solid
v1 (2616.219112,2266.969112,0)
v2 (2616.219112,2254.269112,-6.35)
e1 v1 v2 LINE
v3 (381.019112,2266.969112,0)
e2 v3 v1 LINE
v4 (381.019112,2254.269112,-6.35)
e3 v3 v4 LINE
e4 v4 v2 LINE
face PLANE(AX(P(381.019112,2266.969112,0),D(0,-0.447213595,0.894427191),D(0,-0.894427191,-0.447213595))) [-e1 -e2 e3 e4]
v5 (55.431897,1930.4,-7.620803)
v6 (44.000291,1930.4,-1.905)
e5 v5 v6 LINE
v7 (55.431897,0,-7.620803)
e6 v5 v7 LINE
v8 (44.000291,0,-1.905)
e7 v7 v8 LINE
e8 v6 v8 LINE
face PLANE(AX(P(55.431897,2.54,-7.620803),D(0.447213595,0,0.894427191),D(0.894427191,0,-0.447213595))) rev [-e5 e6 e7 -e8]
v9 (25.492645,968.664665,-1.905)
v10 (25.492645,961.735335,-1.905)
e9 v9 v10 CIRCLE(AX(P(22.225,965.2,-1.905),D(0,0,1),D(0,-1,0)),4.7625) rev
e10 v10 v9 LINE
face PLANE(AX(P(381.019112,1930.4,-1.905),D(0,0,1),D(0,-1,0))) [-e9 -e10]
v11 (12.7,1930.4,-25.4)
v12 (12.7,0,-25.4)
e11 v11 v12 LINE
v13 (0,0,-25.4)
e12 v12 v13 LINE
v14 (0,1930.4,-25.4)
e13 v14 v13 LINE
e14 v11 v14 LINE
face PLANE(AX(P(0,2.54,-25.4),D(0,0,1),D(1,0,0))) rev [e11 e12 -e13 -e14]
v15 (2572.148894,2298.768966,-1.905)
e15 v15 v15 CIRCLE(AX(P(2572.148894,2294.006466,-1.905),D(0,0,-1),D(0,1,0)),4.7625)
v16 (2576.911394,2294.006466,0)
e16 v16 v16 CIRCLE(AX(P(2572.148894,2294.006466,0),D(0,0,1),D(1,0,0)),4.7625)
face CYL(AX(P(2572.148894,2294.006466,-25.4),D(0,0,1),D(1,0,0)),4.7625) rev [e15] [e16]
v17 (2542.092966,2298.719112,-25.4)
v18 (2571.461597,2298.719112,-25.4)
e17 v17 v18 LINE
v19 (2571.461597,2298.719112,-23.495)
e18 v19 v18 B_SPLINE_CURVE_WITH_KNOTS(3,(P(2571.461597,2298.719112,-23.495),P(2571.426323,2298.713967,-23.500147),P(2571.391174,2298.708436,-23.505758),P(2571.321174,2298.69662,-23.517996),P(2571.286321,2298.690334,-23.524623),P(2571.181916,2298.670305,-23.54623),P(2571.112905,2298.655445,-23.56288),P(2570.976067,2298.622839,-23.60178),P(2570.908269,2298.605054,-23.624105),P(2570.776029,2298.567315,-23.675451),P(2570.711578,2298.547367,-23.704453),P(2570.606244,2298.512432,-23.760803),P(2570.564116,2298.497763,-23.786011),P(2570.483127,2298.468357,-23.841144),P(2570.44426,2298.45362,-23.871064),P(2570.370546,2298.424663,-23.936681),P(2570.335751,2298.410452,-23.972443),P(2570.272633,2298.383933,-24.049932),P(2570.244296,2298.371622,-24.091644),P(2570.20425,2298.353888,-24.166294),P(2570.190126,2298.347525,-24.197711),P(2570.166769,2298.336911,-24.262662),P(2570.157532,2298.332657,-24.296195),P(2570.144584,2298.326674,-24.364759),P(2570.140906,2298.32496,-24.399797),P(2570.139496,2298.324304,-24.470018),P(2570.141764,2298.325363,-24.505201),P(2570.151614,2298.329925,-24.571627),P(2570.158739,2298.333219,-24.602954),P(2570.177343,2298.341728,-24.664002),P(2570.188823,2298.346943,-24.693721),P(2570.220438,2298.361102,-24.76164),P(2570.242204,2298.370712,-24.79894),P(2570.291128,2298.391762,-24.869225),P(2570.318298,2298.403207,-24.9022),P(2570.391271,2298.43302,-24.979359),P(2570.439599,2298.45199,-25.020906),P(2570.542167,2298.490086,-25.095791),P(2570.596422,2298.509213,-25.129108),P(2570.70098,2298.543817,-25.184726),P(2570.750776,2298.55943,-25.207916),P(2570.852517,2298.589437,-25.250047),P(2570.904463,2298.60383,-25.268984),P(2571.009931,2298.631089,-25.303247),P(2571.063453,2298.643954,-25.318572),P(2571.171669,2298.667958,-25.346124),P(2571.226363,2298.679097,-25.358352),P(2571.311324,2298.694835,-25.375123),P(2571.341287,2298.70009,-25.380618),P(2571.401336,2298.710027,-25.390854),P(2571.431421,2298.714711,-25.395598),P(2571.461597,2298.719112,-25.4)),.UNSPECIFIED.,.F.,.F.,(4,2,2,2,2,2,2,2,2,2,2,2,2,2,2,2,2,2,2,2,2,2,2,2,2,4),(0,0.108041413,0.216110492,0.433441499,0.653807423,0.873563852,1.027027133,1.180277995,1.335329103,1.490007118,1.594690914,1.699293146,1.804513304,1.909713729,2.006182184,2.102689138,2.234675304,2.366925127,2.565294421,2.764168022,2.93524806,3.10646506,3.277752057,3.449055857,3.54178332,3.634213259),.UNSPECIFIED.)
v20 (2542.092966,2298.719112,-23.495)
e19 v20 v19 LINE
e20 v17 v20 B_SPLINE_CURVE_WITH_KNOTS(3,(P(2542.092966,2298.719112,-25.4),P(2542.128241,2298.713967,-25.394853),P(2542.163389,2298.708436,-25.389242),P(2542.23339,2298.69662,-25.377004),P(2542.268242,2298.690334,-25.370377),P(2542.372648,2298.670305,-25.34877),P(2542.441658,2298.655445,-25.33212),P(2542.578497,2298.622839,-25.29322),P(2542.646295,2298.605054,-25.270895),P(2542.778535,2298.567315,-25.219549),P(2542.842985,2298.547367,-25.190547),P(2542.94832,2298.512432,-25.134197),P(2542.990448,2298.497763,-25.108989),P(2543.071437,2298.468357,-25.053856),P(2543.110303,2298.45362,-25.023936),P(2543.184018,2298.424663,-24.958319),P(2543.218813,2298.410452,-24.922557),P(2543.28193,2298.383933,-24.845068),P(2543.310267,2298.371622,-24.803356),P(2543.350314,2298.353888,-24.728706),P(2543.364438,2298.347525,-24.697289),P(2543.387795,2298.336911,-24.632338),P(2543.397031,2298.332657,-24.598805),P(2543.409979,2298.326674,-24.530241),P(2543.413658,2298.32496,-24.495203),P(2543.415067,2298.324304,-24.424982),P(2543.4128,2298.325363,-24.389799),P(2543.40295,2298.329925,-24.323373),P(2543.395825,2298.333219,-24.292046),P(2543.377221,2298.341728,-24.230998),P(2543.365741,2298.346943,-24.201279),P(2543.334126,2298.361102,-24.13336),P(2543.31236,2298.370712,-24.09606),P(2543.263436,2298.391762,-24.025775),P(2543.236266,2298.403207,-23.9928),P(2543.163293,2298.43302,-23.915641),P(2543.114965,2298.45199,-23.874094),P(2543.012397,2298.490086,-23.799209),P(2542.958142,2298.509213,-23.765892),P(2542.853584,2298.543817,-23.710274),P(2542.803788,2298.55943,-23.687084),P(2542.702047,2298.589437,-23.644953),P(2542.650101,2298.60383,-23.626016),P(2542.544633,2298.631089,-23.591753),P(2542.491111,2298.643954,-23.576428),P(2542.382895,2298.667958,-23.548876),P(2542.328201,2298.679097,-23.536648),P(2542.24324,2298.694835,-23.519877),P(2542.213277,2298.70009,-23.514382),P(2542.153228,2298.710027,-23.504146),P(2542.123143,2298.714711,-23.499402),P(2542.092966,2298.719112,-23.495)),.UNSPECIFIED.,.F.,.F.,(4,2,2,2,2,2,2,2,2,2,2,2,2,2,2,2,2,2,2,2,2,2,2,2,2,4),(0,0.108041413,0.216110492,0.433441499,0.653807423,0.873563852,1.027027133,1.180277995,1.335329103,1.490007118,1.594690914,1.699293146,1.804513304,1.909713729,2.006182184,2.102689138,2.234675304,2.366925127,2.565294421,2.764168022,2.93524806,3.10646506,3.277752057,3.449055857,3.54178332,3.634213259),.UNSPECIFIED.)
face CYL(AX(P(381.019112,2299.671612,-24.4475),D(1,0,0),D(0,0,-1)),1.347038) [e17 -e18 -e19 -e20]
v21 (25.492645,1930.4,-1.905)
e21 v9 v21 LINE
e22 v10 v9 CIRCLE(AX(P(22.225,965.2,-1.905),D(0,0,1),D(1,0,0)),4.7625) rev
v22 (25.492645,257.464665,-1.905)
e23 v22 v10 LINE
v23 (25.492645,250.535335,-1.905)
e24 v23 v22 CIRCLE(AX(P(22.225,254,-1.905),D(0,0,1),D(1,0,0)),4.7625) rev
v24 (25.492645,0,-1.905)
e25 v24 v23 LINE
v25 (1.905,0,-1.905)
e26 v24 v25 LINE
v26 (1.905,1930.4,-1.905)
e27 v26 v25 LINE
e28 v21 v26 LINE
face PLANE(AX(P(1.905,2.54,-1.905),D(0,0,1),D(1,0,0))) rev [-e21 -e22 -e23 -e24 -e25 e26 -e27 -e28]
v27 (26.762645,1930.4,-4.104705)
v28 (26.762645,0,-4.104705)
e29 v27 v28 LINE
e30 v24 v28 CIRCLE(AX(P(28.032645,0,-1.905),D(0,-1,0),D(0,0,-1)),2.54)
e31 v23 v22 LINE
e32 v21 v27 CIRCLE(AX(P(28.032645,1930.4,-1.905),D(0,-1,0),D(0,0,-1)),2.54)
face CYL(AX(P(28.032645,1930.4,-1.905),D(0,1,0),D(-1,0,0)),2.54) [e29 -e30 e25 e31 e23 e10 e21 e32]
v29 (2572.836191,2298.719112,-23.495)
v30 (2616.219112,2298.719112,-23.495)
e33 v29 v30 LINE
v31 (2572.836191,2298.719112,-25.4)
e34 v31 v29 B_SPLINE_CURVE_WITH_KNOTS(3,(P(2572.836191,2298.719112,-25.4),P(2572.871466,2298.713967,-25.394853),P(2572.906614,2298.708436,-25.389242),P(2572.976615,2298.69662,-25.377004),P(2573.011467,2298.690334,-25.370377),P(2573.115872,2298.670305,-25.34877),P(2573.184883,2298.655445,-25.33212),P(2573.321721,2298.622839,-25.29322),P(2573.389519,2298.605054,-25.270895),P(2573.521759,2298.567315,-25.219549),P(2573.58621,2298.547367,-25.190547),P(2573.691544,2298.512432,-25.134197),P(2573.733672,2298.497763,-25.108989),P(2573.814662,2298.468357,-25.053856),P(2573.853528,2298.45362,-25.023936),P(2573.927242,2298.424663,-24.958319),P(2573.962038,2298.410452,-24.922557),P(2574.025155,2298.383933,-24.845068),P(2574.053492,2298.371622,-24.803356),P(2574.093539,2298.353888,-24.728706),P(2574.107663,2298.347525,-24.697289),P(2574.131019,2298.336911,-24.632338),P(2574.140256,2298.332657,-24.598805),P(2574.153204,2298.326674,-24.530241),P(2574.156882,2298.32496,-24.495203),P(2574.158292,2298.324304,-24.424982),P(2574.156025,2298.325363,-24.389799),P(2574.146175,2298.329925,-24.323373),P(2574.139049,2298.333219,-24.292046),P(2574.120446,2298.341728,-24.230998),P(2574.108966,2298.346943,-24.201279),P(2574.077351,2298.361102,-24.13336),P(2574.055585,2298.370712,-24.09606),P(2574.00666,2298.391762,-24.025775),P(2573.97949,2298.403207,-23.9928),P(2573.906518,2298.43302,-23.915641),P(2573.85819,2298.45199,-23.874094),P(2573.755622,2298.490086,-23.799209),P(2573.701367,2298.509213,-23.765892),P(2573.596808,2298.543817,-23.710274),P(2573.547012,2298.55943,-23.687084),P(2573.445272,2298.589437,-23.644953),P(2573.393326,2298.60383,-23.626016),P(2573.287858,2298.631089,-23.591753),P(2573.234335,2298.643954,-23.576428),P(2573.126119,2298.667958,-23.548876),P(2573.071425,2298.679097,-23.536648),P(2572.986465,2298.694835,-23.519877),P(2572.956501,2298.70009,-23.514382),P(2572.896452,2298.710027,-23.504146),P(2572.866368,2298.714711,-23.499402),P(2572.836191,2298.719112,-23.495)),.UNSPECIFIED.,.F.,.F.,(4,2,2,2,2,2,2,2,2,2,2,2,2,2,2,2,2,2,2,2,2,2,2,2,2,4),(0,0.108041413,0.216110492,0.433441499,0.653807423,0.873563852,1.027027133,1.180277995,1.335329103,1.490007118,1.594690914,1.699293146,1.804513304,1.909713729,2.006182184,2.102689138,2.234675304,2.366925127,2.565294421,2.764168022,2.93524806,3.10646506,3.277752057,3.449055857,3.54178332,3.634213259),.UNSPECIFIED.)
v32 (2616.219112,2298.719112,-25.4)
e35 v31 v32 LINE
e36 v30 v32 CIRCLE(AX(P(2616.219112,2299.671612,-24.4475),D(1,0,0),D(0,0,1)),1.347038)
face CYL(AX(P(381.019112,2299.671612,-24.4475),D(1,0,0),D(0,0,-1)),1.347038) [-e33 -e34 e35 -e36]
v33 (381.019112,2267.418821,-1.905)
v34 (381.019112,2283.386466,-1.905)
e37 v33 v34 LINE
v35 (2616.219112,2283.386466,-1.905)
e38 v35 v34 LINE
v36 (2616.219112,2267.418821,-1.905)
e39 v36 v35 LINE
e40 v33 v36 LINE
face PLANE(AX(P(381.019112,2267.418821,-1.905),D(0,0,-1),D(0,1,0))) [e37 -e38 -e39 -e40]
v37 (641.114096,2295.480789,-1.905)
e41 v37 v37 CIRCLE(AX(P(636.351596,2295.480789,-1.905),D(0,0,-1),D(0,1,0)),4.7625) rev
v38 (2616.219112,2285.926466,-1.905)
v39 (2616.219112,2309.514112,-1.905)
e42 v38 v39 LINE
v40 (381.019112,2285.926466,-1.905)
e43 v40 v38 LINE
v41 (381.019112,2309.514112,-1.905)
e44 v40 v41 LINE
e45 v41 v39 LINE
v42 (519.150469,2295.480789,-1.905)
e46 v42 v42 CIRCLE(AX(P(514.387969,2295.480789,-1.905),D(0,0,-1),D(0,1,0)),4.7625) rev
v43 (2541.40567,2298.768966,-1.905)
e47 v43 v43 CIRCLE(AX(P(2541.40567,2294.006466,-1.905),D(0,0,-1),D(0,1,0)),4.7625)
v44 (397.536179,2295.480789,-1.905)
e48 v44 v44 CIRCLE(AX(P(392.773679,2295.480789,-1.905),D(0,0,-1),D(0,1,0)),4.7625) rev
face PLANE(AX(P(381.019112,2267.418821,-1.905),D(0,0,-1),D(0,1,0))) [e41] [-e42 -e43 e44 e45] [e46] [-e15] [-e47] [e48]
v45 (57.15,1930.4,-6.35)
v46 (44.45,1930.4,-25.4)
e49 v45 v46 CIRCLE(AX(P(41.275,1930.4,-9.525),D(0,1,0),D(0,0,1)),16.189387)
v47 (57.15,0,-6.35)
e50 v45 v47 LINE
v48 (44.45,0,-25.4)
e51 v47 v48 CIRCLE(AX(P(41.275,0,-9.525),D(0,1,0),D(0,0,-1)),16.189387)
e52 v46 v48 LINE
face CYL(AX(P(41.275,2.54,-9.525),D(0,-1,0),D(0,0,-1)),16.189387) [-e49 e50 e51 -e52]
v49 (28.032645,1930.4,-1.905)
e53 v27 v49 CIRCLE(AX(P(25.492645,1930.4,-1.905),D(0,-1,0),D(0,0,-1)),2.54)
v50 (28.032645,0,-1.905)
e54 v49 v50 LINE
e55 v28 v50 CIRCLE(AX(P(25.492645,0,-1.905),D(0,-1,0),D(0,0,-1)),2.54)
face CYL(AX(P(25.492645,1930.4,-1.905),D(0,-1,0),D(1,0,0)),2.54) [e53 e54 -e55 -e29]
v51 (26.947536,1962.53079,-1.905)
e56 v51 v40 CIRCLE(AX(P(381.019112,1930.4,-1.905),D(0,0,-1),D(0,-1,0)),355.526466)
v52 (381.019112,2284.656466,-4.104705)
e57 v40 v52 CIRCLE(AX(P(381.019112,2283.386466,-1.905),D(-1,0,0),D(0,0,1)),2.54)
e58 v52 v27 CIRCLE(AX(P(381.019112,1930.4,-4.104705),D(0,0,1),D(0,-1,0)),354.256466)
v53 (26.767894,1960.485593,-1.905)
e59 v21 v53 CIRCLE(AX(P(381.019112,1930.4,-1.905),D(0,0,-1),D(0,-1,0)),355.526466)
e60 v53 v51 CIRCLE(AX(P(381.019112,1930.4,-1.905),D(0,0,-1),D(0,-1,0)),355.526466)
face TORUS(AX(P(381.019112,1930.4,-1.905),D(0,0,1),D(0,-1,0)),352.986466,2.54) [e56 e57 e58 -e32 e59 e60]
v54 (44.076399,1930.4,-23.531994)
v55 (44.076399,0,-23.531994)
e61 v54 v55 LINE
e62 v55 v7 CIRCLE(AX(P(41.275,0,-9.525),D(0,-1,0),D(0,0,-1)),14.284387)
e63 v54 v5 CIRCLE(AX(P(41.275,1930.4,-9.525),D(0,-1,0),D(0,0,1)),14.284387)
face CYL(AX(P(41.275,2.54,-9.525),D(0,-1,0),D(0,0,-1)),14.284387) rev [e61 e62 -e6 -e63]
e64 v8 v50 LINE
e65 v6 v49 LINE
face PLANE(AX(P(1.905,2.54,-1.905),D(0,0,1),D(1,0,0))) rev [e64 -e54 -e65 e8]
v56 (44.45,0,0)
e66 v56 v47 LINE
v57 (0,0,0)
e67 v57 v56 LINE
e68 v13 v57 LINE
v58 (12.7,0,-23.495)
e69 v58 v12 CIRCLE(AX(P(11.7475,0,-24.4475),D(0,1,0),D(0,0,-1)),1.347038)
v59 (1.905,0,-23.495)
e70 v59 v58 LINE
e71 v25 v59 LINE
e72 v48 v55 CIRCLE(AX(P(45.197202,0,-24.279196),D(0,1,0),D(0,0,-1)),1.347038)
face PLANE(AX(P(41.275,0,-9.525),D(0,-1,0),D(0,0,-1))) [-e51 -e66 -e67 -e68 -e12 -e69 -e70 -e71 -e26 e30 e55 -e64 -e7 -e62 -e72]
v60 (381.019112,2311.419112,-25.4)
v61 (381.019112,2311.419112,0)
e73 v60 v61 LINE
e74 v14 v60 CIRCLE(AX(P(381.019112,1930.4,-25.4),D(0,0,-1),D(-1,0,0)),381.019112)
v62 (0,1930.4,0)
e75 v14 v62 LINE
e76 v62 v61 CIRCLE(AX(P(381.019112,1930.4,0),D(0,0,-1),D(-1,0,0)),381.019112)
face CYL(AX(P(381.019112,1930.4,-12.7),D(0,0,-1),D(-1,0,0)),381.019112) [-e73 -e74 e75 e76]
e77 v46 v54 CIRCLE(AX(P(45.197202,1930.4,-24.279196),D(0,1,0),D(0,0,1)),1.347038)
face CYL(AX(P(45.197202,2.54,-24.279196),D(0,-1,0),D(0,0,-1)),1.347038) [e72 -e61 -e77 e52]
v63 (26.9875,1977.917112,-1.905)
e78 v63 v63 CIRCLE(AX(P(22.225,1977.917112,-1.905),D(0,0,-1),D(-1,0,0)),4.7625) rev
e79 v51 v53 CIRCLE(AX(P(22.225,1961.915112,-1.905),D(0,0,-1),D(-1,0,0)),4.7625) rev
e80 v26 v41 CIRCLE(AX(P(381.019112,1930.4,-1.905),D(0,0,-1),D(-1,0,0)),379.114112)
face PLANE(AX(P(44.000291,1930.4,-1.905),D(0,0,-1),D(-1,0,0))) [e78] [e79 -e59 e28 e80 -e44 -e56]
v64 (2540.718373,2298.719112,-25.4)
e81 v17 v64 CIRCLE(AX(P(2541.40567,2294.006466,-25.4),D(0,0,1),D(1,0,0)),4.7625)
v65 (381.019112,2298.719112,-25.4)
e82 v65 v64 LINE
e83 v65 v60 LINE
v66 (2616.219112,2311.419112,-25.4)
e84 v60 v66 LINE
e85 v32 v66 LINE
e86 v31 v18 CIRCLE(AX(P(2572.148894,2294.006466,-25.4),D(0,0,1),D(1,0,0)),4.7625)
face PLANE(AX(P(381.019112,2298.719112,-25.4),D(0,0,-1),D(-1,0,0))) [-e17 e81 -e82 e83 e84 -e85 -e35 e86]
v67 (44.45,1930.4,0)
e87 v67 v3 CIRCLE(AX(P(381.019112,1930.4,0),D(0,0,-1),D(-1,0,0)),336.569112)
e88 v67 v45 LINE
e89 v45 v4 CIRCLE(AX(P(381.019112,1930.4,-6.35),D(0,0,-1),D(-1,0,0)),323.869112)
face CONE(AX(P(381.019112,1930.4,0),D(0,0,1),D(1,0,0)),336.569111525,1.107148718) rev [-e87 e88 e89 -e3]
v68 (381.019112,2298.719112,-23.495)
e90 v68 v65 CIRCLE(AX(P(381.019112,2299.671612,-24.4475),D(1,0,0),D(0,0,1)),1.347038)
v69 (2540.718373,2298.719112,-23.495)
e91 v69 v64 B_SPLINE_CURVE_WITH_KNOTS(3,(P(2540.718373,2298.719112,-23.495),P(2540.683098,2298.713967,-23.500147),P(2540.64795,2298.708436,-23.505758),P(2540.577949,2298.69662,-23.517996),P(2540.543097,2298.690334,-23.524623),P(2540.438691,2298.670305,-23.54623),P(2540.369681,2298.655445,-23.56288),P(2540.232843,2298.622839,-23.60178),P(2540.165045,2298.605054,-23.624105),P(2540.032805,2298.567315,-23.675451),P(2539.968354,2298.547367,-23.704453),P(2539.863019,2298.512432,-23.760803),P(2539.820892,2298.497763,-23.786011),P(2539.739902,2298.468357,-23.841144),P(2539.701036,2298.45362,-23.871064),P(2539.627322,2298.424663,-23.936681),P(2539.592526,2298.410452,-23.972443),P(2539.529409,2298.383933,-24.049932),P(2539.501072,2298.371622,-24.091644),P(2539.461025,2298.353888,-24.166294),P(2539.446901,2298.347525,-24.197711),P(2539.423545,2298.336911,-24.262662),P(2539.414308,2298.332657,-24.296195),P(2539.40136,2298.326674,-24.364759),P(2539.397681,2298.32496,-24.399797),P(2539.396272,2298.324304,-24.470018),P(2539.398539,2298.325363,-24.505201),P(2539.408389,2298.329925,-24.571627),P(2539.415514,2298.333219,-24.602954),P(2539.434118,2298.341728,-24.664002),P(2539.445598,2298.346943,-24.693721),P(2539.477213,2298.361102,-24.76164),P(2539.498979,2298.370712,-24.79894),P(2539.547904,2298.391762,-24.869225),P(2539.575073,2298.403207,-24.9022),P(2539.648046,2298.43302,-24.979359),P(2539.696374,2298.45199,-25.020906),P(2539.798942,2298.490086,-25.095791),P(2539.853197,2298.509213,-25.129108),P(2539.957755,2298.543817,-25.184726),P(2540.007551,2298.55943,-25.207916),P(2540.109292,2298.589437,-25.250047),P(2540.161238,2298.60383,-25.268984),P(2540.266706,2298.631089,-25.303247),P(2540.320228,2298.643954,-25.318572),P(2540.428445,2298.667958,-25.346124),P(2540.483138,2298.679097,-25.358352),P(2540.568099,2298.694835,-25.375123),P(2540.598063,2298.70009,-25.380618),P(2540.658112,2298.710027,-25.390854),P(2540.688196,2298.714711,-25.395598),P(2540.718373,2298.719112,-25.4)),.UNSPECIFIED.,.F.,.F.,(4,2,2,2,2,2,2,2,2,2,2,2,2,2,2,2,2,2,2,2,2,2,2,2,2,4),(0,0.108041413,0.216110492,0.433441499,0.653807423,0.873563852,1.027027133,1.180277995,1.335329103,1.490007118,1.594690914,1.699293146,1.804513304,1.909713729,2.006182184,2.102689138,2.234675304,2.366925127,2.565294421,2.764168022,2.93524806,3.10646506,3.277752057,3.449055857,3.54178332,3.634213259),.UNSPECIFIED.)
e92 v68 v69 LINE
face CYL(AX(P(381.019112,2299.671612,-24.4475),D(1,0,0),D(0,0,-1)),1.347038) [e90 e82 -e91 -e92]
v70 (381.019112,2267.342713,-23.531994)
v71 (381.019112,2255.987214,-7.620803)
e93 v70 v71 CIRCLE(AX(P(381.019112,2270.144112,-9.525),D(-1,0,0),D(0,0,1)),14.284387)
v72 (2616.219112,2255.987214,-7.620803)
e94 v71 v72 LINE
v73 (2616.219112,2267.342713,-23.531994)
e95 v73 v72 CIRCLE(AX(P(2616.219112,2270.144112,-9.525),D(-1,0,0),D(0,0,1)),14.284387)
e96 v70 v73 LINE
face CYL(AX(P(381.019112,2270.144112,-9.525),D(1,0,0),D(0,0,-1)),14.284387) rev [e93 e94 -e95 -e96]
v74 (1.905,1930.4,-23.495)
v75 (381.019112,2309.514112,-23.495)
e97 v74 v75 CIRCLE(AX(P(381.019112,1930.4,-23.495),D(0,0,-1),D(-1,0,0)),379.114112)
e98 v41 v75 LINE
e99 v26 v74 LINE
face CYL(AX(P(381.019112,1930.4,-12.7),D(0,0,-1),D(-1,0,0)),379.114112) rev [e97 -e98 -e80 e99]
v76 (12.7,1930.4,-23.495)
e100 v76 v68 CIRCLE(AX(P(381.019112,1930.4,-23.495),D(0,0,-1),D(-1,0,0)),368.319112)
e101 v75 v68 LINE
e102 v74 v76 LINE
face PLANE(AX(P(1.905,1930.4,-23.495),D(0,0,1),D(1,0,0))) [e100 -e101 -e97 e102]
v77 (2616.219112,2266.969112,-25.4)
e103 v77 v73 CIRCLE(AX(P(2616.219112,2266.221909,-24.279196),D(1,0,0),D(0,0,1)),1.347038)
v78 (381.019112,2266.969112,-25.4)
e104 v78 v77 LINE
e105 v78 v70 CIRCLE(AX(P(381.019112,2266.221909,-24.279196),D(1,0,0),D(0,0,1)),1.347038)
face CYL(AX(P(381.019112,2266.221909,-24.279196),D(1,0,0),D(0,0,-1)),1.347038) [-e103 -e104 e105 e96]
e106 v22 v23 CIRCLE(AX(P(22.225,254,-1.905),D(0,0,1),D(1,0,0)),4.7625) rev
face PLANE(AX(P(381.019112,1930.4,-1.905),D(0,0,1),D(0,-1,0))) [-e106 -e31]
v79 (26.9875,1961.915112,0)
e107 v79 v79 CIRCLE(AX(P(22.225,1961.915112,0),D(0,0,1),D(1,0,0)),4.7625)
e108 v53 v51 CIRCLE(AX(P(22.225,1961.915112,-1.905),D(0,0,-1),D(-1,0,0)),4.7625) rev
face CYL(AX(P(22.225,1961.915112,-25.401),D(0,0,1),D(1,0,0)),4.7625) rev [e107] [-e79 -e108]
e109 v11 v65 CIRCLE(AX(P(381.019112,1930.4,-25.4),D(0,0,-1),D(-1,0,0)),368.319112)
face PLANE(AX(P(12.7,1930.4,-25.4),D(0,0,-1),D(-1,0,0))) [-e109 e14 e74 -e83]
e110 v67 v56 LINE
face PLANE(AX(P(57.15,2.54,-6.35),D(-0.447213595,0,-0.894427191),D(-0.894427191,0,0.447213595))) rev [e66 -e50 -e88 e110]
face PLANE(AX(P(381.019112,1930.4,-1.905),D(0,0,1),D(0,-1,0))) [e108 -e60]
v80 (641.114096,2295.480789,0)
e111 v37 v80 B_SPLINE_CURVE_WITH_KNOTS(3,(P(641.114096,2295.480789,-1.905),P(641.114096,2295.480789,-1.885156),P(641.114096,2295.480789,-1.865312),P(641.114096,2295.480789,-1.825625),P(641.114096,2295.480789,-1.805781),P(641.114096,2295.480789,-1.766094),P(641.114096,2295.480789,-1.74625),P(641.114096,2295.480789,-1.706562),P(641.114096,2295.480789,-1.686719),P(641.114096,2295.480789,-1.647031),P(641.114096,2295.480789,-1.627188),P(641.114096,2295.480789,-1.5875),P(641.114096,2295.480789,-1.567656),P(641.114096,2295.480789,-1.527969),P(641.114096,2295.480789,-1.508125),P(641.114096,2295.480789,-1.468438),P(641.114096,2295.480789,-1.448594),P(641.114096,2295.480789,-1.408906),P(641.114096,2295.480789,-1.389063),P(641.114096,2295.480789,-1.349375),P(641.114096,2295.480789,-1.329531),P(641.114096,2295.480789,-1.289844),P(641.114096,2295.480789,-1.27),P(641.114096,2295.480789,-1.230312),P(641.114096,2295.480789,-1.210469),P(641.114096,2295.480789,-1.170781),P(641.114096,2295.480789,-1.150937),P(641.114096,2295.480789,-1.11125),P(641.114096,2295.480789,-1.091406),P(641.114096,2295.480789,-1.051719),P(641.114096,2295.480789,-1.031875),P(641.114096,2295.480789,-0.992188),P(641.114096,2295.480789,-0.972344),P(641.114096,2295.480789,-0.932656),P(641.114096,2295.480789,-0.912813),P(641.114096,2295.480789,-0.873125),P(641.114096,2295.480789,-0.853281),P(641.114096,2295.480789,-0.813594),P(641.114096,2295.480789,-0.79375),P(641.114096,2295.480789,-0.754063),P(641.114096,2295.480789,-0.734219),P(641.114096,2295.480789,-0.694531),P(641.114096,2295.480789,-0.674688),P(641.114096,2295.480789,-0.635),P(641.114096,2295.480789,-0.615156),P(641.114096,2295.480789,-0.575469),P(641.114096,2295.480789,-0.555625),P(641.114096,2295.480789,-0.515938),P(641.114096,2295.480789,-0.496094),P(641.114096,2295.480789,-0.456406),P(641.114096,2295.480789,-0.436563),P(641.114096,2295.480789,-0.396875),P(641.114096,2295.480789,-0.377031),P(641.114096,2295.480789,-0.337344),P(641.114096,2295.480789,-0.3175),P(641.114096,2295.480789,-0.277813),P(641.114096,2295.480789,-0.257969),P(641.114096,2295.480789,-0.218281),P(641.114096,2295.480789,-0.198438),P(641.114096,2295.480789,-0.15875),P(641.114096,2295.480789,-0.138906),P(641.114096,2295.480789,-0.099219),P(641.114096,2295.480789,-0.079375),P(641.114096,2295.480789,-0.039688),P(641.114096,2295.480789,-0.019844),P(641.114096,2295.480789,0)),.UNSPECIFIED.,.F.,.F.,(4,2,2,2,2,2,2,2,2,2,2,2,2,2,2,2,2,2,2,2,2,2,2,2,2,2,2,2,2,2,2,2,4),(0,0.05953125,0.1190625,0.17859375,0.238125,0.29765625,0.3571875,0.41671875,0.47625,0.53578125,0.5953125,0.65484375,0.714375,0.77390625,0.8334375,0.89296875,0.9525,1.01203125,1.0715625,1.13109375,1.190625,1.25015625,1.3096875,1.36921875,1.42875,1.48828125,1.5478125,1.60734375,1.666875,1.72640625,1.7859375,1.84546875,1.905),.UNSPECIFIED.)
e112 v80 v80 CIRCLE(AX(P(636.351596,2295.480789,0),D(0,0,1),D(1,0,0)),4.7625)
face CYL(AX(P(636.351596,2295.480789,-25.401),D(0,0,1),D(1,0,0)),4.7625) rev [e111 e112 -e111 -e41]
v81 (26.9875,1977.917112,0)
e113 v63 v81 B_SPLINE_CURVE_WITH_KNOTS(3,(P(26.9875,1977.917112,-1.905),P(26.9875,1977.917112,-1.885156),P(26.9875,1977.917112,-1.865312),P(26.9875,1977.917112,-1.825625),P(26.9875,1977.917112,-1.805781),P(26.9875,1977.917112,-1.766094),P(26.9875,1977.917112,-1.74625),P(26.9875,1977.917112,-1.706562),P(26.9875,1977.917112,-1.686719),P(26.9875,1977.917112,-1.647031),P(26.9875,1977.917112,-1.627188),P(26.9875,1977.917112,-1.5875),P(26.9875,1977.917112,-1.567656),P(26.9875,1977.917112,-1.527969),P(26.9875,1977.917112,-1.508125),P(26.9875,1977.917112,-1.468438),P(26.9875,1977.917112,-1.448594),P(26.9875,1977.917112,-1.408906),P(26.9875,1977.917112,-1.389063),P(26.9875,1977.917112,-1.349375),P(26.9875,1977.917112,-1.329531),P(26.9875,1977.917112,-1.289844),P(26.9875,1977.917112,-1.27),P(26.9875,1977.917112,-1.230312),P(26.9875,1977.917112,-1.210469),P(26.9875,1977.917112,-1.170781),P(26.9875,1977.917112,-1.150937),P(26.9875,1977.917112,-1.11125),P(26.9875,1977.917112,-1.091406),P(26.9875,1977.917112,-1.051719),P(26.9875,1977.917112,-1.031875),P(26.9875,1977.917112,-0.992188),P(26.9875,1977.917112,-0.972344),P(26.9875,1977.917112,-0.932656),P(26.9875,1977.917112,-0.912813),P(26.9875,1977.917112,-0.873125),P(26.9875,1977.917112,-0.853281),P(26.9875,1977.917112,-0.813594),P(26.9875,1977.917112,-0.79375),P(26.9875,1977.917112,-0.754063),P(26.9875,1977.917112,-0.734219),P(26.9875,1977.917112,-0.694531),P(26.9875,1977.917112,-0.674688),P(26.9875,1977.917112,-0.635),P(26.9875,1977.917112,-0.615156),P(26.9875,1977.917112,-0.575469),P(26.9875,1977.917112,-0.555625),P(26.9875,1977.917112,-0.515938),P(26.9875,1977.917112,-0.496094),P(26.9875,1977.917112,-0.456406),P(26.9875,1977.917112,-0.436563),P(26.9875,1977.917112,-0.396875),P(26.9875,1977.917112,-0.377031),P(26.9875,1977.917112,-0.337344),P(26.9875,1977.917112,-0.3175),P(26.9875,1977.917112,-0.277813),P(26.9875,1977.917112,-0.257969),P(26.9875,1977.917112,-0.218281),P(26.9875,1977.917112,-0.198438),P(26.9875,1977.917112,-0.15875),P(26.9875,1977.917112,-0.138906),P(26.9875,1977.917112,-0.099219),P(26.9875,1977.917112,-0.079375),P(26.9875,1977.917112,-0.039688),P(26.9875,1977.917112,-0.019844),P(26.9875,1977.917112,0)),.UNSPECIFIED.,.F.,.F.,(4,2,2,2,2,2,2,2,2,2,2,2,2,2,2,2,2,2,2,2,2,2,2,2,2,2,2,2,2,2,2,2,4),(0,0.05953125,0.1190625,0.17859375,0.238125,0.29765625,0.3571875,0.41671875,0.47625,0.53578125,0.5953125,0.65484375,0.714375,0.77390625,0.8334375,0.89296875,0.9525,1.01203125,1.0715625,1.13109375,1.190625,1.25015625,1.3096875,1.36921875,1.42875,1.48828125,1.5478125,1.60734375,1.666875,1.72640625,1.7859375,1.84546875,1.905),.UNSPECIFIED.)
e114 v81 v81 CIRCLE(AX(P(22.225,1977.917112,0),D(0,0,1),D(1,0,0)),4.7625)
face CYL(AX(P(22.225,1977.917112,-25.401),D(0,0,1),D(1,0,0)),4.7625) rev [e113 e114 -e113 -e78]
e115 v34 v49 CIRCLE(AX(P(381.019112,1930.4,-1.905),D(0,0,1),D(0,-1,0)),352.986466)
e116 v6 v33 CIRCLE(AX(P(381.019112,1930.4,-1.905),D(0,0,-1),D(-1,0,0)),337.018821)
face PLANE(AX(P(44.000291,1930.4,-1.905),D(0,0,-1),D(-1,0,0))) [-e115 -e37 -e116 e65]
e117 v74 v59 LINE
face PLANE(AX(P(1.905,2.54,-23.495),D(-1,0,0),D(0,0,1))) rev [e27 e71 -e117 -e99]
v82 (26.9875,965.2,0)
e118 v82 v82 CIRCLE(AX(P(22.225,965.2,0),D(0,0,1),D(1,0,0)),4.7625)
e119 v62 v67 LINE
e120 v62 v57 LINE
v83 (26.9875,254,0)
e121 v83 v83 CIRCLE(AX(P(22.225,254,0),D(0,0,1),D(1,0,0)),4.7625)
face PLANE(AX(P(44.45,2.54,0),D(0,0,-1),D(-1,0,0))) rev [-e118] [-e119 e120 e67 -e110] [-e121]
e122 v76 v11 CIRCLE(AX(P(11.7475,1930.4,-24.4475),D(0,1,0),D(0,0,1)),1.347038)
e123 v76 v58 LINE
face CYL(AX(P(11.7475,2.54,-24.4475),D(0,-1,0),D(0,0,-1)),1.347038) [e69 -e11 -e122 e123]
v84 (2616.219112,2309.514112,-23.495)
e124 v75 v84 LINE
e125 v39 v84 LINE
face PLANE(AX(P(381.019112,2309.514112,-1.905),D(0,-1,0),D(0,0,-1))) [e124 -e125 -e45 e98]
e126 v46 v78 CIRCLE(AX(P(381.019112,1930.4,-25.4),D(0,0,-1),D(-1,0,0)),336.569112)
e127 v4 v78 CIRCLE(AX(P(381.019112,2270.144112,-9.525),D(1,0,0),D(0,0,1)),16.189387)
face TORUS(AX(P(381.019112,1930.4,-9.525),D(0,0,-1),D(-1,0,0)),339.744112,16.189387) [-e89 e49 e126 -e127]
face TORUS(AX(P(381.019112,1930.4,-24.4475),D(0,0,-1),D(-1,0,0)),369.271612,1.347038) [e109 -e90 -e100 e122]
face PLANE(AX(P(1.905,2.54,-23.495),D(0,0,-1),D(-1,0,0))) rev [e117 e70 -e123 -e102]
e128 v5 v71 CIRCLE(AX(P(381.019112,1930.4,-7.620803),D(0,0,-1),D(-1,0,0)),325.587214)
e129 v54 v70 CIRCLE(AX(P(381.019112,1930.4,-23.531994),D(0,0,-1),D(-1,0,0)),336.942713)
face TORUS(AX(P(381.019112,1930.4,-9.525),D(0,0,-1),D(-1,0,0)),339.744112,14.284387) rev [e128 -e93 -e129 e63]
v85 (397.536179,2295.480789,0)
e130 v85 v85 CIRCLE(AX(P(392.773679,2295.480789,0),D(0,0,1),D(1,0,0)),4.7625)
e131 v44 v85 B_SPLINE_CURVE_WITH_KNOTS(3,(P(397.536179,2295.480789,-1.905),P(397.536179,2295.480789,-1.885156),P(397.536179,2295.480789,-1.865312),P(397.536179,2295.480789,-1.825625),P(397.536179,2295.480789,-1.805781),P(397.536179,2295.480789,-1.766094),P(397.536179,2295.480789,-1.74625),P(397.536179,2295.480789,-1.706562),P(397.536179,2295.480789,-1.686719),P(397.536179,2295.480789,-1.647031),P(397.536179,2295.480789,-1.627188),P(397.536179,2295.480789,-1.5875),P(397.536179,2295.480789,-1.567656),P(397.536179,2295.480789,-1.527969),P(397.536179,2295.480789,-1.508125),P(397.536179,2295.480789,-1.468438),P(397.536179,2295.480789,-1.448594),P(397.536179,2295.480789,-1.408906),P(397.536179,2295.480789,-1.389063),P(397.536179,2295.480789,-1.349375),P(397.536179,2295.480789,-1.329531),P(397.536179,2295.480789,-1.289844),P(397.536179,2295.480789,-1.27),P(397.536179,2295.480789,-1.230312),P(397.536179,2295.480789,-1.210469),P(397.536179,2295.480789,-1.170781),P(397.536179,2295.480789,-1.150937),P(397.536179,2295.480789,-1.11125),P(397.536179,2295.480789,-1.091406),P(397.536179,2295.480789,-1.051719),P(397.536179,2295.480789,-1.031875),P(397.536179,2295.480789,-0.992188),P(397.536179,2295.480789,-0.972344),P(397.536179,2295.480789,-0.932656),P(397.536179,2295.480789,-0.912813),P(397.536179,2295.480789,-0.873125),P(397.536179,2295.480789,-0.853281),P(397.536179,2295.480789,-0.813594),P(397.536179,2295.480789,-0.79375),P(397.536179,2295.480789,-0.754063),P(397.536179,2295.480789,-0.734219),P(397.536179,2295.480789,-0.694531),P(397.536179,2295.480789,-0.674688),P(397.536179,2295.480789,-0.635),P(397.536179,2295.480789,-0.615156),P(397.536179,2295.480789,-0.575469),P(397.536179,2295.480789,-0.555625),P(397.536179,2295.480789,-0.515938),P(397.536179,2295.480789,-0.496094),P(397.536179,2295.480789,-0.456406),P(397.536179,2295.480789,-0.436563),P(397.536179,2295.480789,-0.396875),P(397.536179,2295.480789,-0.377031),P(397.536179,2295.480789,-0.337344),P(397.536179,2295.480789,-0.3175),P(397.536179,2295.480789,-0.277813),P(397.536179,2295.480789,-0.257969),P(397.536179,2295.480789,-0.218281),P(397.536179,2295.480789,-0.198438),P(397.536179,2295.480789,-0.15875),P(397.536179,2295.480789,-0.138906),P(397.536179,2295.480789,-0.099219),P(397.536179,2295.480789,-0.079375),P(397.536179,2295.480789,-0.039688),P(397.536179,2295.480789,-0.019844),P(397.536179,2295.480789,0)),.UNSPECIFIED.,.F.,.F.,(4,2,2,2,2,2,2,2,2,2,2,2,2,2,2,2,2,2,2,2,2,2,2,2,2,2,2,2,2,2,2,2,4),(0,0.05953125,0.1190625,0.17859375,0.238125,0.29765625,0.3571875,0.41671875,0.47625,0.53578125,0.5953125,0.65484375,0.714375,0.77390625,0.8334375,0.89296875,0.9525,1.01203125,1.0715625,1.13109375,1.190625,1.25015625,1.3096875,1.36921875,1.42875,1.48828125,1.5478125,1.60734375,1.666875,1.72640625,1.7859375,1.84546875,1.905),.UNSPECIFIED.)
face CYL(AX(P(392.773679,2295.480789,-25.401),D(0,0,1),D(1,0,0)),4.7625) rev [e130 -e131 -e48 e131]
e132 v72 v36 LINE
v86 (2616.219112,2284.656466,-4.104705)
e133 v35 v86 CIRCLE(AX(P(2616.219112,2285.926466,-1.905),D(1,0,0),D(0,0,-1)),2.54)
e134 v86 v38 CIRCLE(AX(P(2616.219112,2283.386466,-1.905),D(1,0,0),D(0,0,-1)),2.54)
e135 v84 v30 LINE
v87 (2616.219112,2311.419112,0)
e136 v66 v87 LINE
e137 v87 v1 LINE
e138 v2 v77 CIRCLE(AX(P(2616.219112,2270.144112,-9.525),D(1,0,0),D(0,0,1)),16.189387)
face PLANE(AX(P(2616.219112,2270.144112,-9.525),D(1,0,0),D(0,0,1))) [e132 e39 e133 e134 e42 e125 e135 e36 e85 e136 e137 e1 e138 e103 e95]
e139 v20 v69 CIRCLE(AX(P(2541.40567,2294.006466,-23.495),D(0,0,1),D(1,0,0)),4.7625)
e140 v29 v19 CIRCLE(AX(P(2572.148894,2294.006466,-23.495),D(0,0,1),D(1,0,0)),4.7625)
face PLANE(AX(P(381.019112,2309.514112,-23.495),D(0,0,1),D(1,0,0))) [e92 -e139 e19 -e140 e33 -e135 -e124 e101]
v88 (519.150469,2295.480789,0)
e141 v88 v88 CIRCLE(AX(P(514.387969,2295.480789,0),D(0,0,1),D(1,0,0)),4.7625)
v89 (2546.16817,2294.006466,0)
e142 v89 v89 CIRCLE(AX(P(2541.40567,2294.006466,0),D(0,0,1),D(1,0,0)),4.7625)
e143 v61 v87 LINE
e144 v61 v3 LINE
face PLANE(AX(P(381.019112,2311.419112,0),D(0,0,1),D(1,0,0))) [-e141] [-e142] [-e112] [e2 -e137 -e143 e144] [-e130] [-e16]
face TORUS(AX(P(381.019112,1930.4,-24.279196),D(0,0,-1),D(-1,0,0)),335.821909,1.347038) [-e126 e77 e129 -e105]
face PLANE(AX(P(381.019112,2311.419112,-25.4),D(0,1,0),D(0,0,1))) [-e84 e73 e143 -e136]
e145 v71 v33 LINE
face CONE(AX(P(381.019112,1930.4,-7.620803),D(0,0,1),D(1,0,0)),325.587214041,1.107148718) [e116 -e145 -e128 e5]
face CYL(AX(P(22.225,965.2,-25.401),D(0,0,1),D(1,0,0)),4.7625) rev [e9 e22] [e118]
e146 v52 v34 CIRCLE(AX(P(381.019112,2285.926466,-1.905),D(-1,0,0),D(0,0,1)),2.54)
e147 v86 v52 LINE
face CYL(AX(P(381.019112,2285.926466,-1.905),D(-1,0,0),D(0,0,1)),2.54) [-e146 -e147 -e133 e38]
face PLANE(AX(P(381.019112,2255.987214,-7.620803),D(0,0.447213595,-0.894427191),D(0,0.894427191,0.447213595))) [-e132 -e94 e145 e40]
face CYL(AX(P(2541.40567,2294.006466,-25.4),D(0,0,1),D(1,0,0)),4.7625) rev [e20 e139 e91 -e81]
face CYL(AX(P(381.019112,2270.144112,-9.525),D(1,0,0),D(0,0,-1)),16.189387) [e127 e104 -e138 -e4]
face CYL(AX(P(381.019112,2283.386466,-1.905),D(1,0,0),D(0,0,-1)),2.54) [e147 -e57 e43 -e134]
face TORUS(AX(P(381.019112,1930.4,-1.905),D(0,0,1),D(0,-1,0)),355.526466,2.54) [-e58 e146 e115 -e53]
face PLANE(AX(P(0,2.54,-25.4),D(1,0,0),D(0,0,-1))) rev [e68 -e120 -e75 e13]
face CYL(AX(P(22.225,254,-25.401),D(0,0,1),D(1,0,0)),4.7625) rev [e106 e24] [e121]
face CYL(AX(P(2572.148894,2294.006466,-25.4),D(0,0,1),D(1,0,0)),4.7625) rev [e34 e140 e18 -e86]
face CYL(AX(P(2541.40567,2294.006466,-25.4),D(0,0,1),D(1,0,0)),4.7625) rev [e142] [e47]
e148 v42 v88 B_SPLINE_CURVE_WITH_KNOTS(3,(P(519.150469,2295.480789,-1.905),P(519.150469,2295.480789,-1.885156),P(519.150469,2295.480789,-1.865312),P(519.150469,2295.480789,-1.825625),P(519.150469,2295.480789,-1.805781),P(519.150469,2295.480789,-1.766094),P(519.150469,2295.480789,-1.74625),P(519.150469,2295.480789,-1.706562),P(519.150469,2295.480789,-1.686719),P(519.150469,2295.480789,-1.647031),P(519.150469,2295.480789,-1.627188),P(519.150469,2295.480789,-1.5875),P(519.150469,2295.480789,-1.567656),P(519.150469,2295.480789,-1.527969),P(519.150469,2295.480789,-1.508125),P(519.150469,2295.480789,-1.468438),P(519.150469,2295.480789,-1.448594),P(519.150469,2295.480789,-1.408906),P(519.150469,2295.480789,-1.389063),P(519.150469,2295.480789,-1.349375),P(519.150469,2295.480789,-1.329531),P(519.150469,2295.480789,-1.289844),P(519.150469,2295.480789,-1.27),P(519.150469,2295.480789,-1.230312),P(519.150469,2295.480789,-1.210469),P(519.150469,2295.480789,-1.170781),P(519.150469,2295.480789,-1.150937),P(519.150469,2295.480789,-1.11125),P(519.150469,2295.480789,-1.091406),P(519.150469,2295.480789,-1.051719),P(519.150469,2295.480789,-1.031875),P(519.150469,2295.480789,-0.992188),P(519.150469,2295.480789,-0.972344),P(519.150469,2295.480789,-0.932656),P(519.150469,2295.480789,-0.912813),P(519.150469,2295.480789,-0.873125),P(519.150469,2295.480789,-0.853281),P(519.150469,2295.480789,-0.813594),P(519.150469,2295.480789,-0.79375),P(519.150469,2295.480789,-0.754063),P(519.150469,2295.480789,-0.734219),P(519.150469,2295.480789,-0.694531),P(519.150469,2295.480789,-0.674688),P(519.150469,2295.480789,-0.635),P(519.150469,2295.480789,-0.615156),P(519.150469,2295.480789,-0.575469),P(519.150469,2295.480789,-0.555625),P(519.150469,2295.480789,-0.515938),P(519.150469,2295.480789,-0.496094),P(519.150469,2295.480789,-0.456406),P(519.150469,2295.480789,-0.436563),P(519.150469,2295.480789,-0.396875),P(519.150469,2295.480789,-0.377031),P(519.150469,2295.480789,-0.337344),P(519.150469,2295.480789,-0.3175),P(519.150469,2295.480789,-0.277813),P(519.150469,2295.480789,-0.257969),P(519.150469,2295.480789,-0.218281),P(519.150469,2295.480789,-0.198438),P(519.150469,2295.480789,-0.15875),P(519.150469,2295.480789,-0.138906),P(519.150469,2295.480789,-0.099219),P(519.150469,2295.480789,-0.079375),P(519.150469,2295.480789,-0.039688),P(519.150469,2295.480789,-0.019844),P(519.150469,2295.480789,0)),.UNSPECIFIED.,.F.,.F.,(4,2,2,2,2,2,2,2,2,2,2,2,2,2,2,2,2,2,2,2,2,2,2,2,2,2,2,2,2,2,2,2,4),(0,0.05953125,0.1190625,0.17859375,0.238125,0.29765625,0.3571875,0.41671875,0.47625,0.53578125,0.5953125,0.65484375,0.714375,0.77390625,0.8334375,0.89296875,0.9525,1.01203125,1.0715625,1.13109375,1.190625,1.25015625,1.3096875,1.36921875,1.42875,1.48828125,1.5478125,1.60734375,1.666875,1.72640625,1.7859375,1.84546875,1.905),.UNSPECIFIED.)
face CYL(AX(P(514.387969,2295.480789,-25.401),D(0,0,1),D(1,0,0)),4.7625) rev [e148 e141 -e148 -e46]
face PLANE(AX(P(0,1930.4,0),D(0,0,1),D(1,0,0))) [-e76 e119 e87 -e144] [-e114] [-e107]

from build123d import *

# Parameters (mm, degrees)
BOSS_EXTRUDE1_DEPTH = 2.54
SWEEP1_START        = 2.54
SWEEP1_DEPTH        = 1927.86
SWEEP1_START_2      = 381.019111525
SWEEP1_2_DEPTH      = 2235.2
SWEEP1_3_ANGLE      = 90
CUT_EXTRUDE1_REACH  = 3493.118
SKETCH4_R           = 4.7625
CUT_EXTRUDE2_REACH  = 3493.118
SKETCH5_R           = 4.7625
BOSS_EXTRUDE2_DEPTH = 2.54
FILLET1_R           = 2.54
SKETCH7_R           = 4.7625
CUT_EXTRUDE3_DEPTH  = 3492.1181459


with BuildPart() as part:
    # Sketch2 → Boss-Extrude1 (new body)
    with BuildSketch(Plane(origin=(0, 0, 0), x_dir=(1, 0, 0), z_dir=(0, 1, 0))):
        with BuildLine():
            Line((0, 25.4), (12.7, 25.4))
            ThreePointArc((12.7, 25.4), (13.094538418, 24.4475), (12.7, 23.495))
            Line((12.7, 23.495), (1.905, 23.495))
            Line((1.905, 23.495), (1.905, 1.905))
            Line((1.905, 1.905), (34.925, 1.905))
            Line((34.925, 1.905), (44.000290503, 1.905))
            Line((44.000290503, 1.905), (55.431897483, 7.62080349))
            ThreePointArc((55.431897483, 7.62080349), (52.902013686, 17.822967428), (44.076398763, 23.531993813))
            ThreePointArc((44.076398763, 23.531993813), (43.876322633, 24.543372256), (44.45, 25.4))
            ThreePointArc((44.45, 25.4), (54.745384182, 18.505256121), (57.15, 6.35))
            Line((57.15, 6.35), (44.45, 0))
            Line((44.45, 0), (34.925, 0))
            Line((34.925, 0), (0, 0))
            Line((0, 0), (0, 25.4))
        make_face()
    extrude(amount=BOSS_EXTRUDE1_DEPTH)

    # Sweep1: read off the stored shape, not the designer's step
    # Sweep1 outline → Sweep1 (add)
    with BuildSketch(Plane(origin=(0, 0, 0), x_dir=(1, 0, 0), z_dir=(0, 1, 0)).offset(SWEEP1_START)):
        with BuildLine():
            Line((0, 0), (44.45, 0))
            Line((44.45, 0), (57.15, 6.35))
            ThreePointArc((57.15, 6.35), (54.745384182, 18.505256121), (44.45, 25.4))
            ThreePointArc((44.45, 25.4), (43.876322633, 24.543372256), (44.076398763, 23.531993813))
            ThreePointArc((44.076398763, 23.531993813), (52.902013686, 17.822967428), (55.431897483, 7.62080349))
            Line((55.431897483, 7.62080349), (44.000290503, 1.905))
            Line((44.000290503, 1.905), (1.905, 1.905))
            Line((1.905, 1.905), (1.905, 23.495))
            Line((1.905, 23.495), (12.7, 23.495))
            ThreePointArc((12.7, 23.495), (13.094538418, 24.4475), (12.7, 25.4))
            Line((12.7, 25.4), (0, 25.4))
            Line((0, 25.4), (0, 0))
        make_face()
    extrude(amount=SWEEP1_DEPTH)



with BuildPart() as body_2:
    # Sweep1 2 outline → Sweep1 2 (new body)
    with BuildSketch(Plane.YZ.offset(SWEEP1_START_2)):
        with BuildLine():
            Line((2311.419111525, -25.4), (2311.419111525, 0))
            Line((2311.419111525, 0), (2266.969111525, 0))
            Line((2266.969111525, 0), (2254.269111525, -6.35))
            ThreePointArc((2254.269111525, -6.35), (2256.673727343, -18.505256121), (2266.969111525, -25.4))
            ThreePointArc((2266.969111525, -25.4), (2267.542788892, -24.543372256), (2267.342712762, -23.531993813))
            ThreePointArc((2267.342712762, -23.531993813), (2258.517097838, -17.822967428), (2255.987214041, -7.62080349))
            Line((2255.987214041, -7.62080349), (2267.418821022, -1.905))
            Line((2267.418821022, -1.905), (2309.514111525, -1.905))
            Line((2309.514111525, -1.905), (2309.514111525, -23.495))
            Line((2309.514111525, -23.495), (2298.719111525, -23.495))
            ThreePointArc((2298.719111525, -23.495), (2298.324573106, -24.4475), (2298.719111525, -25.4))
            Line((2298.719111525, -25.4), (2311.419111525, -25.4))
        make_face()
    extrude(amount=SWEEP1_2_DEPTH)


with BuildPart() as part_1:
    add(part.part)

    add(body_2.part)  # Sweep1 3 merges body 2
    # Sweep1 3 outline → Sweep1 3 (revolve)
    with BuildSketch(Plane(origin=(381.019111525, 1930.4, 0), x_dir=(0, 1, 0), z_dir=(1, 0, 0))):
        with BuildLine():
            Line((336.569111525, 0), (323.869111525, -6.35))
            ThreePointArc((323.869111525, -6.35), (326.273727343, -18.505256121), (336.569111525, -25.4))
            ThreePointArc((336.569111525, -25.4), (337.142788892, -24.543372256), (336.942712762, -23.531993813))
            ThreePointArc((336.942712762, -23.531993813), (328.117097838, -17.822967428), (325.587214041, -7.62080349))
            Line((325.587214041, -7.62080349), (337.018821022, -1.905))
            Line((337.018821022, -1.905), (379.114111525, -1.905))
            Line((379.114111525, -1.905), (379.114111525, -23.495))
            Line((379.114111525, -23.495), (368.319111525, -23.495))
            ThreePointArc((368.319111525, -23.495), (367.924573106, -24.4475), (368.319111525, -25.4))
            Line((368.319111525, -25.4), (381.019111525, -25.4))
            Line((381.019111525, -25.4), (381.019111525, 0))
            Line((381.019111525, 0), (336.569111525, 0))
        make_face()
    revolve(axis=Axis((381.019111525, 1930.4, 0), (0, 0, 1)), revolution_arc=SWEEP1_3_ANGLE)

    # Sketch4 → Cut-Extrude1 (cut, up to next)
    with BuildSketch(Plane.XY, mode=Mode.PRIVATE) as cut_extrude1_sk1:
        with Locations((22.225, 254)):
            Circle(SKETCH4_R)
    cut_extrude1_tool1 = extrude(cut_extrude1_sk1.sketch, amount=-CUT_EXTRUDE1_REACH, mode=Mode.PRIVATE) & part_1.part
    # Sketch4 → Cut-Extrude1 (cut, up to next)
    with BuildSketch(Plane.XY, mode=Mode.PRIVATE) as cut_extrude1_sk2:
        with Locations((22.225, 965.2)):
            Circle(SKETCH4_R)
    cut_extrude1_tool2 = extrude(cut_extrude1_sk2.sketch, amount=-CUT_EXTRUDE1_REACH, mode=Mode.PRIVATE) & part_1.part
    # Sketch4 → Cut-Extrude1 (cut, up to next)
    with BuildSketch(Plane.XY, mode=Mode.PRIVATE) as cut_extrude1_sk3:
        with Locations((22.225, 1977.917111525)):
            Circle(SKETCH4_R)
    cut_extrude1_tool3 = extrude(cut_extrude1_sk3.sketch, amount=-CUT_EXTRUDE1_REACH, mode=Mode.PRIVATE) & part_1.part
    # Sketch4 → Cut-Extrude1 (cut, up to next)
    with BuildSketch(Plane.XY, mode=Mode.PRIVATE) as cut_extrude1_sk4:
        with Locations((22.225, 1961.915111525)):
            Circle(SKETCH4_R)
    cut_extrude1_tool4 = extrude(cut_extrude1_sk4.sketch, amount=-CUT_EXTRUDE1_REACH, mode=Mode.PRIVATE) & part_1.part
    add(cut_extrude1_tool1.solids().sort_by_distance((22.225, 254, 0))[0], mode=Mode.SUBTRACT)
    add(cut_extrude1_tool2.solids().sort_by_distance((22.225, 965.2, 0))[0], mode=Mode.SUBTRACT)
    add(cut_extrude1_tool3.solids().sort_by_distance((22.225, 1977.917112, 0))[0], mode=Mode.SUBTRACT)
    add(cut_extrude1_tool4.solids().sort_by_distance((22.225, 1961.915112, 0))[0], mode=Mode.SUBTRACT)

    # Sketch5 → Cut-Extrude2 (cut, up to next)
    with BuildSketch(Plane.XY, mode=Mode.PRIVATE) as cut_extrude2_sk1:
        with Locations((392.773679289, 2295.48078944)):
            Circle(SKETCH5_R)
    cut_extrude2_tool1 = extrude(cut_extrude2_sk1.sketch, amount=-CUT_EXTRUDE2_REACH, mode=Mode.PRIVATE) & part_1.part
    # Sketch5 → Cut-Extrude2 (cut, up to next)
    with BuildSketch(Plane.XY, mode=Mode.PRIVATE) as cut_extrude2_sk2:
        with Locations((514.387968665, 2295.48078944)):
            Circle(SKETCH5_R)
    cut_extrude2_tool2 = extrude(cut_extrude2_sk2.sketch, amount=-CUT_EXTRUDE2_REACH, mode=Mode.PRIVATE) & part_1.part
    # Sketch5 → Cut-Extrude2 (cut, up to next)
    with BuildSketch(Plane.XY, mode=Mode.PRIVATE) as cut_extrude2_sk3:
        with Locations((636.351596179, 2295.48078944)):
            Circle(SKETCH5_R)
    cut_extrude2_tool3 = extrude(cut_extrude2_sk3.sketch, amount=-CUT_EXTRUDE2_REACH, mode=Mode.PRIVATE) & part_1.part
    add(cut_extrude2_tool1.solids().sort_by_distance((392.773679, 2295.480789, 0))[0], mode=Mode.SUBTRACT)
    add(cut_extrude2_tool2.solids().sort_by_distance((514.387969, 2295.480789, 0))[0], mode=Mode.SUBTRACT)
    add(cut_extrude2_tool3.solids().sort_by_distance((636.351596, 2295.480789, 0))[0], mode=Mode.SUBTRACT)

    # Sketch6 → Boss-Extrude2 (add)
    with BuildSketch(Plane(origin=(0, 0, -1.905), x_dir=(-1, 0, 0), z_dir=(0, 0, -1))):
        with BuildLine():
            Line((-2616.219111525, 2285.926466273), (-2616.219111525, 2283.386466273))
            Line((-2616.219111525, 2283.386466273), (-381.019111525, 2283.386466273))
            ThreePointArc((-381.019111525, 2283.386466273), (-131.419987556, 2179.999123969), (-28.032645251, 1930.4))
            Line((-28.032645251, 1930.4), (-28.032645251, 0))
            Line((-28.032645251, 0), (-25.492645251, 0))
            Line((-25.492645251, 0), (-25.492645251, 1930.4))
            ThreePointArc((-25.492645251, 1930.4), (-129.623936332, 2181.795175193), (-381.019111525, 2285.926466273))
            Line((-381.019111525, 2285.926466273), (-2616.219111525, 2285.926466273))
        make_face()
    extrude(amount=BOSS_EXTRUDE2_DEPTH)

    # Fillet1
    # the kernel refuses this fillet: 2.54 mm, written as the material it takes off along each edge
    with BuildSketch(Plane(origin=(25.492645251, -6.35, -4.445), x_dir=(0, 0, 1), z_dir=(0, 1, 0)), Plane(origin=(28.032645251, 1930.4, -4.445), x_dir=(0, 0, 1), z_dir=(0, -1, 0))) as fillet1_piece_1:
        with BuildLine():
            CenterArc((FILLET1_R, FILLET1_R), FILLET1_R, 180, 90)
            Line((0, FILLET1_R), (0, 0))
            Line((0, 0), (FILLET1_R, 0))
        make_face()
    extrude(amount=1936.75, mode=Mode.SUBTRACT)
    with BuildSketch(Plane(origin=(381.019111525, 1930.4, -4.445), x_dir=(-1, 0, 0), z_dir=(0, -1, 0))) as fillet1_piece_2:
        with BuildLine():
            CenterArc((355.526466273 - FILLET1_R, -FILLET1_R), FILLET1_R, 0, 90)
            Line((355.526466273, -FILLET1_R), (355.526466273, 0))
            Line((355.526466273, 0), (355.526466273 - FILLET1_R, 0))
        make_face()
    revolve(axis=Axis((381.019111525, 1930.4, -4.445), (0, 0, -1)), revolution_arc=90, mode=Mode.SUBTRACT)
    with BuildSketch(Plane(origin=(381.019111525, 1930.4, -4.445), x_dir=(0, 1, 0), z_dir=(1, 0, 0))) as fillet1_piece_3:
        with BuildLine():
            CenterArc((352.986466273 + FILLET1_R, FILLET1_R), FILLET1_R, 180, 90)
            Line((352.986466273 + FILLET1_R, 0), (352.986466273, 0))
            Line((352.986466273, 0), (352.986466273, FILLET1_R))
        make_face()
    revolve(axis=Axis((381.019111525, 1930.4, -4.445), (0, 0, 1)), revolution_arc=90, mode=Mode.SUBTRACT)
    with BuildSketch(Plane(origin=(381.019111525, 2285.926466273, -4.445), x_dir=(0, -1, 0), z_dir=(1, 0, 0))) as fillet1_piece_4:
        with BuildLine():
            CenterArc((FILLET1_R, -FILLET1_R), FILLET1_R, 90, 90)
            Line((0, -FILLET1_R), (0, 0))
            Line((0, 0), (FILLET1_R, 0))
        make_face()
    extrude(amount=2241.55, mode=Mode.SUBTRACT)
    with BuildSketch(Plane(origin=(2622.569111525, 2283.386466273, -4.445), x_dir=(0, 0, 1), z_dir=(-1, 0, 0))) as fillet1_piece_5:
        with BuildLine():
            CenterArc((FILLET1_R, FILLET1_R), FILLET1_R, 180, 90)
            Line((0, FILLET1_R), (0, 0))
            Line((0, 0), (FILLET1_R, 0))
        make_face()
    extrude(amount=2241.55, mode=Mode.SUBTRACT)

    # Sketch7 → Cut-Extrude3 (cut, through all)
    with BuildSketch(Plane.XY):
        with Locations((2572.148894219, 2294.006465832)):
            Circle(SKETCH7_R)
        with Locations((2541.405669578, 2294.006465832)):
            Circle(SKETCH7_R)
    extrude(amount=-CUT_EXTRUDE3_DEPTH, mode=Mode.SUBTRACT)


solid = part_1.part
